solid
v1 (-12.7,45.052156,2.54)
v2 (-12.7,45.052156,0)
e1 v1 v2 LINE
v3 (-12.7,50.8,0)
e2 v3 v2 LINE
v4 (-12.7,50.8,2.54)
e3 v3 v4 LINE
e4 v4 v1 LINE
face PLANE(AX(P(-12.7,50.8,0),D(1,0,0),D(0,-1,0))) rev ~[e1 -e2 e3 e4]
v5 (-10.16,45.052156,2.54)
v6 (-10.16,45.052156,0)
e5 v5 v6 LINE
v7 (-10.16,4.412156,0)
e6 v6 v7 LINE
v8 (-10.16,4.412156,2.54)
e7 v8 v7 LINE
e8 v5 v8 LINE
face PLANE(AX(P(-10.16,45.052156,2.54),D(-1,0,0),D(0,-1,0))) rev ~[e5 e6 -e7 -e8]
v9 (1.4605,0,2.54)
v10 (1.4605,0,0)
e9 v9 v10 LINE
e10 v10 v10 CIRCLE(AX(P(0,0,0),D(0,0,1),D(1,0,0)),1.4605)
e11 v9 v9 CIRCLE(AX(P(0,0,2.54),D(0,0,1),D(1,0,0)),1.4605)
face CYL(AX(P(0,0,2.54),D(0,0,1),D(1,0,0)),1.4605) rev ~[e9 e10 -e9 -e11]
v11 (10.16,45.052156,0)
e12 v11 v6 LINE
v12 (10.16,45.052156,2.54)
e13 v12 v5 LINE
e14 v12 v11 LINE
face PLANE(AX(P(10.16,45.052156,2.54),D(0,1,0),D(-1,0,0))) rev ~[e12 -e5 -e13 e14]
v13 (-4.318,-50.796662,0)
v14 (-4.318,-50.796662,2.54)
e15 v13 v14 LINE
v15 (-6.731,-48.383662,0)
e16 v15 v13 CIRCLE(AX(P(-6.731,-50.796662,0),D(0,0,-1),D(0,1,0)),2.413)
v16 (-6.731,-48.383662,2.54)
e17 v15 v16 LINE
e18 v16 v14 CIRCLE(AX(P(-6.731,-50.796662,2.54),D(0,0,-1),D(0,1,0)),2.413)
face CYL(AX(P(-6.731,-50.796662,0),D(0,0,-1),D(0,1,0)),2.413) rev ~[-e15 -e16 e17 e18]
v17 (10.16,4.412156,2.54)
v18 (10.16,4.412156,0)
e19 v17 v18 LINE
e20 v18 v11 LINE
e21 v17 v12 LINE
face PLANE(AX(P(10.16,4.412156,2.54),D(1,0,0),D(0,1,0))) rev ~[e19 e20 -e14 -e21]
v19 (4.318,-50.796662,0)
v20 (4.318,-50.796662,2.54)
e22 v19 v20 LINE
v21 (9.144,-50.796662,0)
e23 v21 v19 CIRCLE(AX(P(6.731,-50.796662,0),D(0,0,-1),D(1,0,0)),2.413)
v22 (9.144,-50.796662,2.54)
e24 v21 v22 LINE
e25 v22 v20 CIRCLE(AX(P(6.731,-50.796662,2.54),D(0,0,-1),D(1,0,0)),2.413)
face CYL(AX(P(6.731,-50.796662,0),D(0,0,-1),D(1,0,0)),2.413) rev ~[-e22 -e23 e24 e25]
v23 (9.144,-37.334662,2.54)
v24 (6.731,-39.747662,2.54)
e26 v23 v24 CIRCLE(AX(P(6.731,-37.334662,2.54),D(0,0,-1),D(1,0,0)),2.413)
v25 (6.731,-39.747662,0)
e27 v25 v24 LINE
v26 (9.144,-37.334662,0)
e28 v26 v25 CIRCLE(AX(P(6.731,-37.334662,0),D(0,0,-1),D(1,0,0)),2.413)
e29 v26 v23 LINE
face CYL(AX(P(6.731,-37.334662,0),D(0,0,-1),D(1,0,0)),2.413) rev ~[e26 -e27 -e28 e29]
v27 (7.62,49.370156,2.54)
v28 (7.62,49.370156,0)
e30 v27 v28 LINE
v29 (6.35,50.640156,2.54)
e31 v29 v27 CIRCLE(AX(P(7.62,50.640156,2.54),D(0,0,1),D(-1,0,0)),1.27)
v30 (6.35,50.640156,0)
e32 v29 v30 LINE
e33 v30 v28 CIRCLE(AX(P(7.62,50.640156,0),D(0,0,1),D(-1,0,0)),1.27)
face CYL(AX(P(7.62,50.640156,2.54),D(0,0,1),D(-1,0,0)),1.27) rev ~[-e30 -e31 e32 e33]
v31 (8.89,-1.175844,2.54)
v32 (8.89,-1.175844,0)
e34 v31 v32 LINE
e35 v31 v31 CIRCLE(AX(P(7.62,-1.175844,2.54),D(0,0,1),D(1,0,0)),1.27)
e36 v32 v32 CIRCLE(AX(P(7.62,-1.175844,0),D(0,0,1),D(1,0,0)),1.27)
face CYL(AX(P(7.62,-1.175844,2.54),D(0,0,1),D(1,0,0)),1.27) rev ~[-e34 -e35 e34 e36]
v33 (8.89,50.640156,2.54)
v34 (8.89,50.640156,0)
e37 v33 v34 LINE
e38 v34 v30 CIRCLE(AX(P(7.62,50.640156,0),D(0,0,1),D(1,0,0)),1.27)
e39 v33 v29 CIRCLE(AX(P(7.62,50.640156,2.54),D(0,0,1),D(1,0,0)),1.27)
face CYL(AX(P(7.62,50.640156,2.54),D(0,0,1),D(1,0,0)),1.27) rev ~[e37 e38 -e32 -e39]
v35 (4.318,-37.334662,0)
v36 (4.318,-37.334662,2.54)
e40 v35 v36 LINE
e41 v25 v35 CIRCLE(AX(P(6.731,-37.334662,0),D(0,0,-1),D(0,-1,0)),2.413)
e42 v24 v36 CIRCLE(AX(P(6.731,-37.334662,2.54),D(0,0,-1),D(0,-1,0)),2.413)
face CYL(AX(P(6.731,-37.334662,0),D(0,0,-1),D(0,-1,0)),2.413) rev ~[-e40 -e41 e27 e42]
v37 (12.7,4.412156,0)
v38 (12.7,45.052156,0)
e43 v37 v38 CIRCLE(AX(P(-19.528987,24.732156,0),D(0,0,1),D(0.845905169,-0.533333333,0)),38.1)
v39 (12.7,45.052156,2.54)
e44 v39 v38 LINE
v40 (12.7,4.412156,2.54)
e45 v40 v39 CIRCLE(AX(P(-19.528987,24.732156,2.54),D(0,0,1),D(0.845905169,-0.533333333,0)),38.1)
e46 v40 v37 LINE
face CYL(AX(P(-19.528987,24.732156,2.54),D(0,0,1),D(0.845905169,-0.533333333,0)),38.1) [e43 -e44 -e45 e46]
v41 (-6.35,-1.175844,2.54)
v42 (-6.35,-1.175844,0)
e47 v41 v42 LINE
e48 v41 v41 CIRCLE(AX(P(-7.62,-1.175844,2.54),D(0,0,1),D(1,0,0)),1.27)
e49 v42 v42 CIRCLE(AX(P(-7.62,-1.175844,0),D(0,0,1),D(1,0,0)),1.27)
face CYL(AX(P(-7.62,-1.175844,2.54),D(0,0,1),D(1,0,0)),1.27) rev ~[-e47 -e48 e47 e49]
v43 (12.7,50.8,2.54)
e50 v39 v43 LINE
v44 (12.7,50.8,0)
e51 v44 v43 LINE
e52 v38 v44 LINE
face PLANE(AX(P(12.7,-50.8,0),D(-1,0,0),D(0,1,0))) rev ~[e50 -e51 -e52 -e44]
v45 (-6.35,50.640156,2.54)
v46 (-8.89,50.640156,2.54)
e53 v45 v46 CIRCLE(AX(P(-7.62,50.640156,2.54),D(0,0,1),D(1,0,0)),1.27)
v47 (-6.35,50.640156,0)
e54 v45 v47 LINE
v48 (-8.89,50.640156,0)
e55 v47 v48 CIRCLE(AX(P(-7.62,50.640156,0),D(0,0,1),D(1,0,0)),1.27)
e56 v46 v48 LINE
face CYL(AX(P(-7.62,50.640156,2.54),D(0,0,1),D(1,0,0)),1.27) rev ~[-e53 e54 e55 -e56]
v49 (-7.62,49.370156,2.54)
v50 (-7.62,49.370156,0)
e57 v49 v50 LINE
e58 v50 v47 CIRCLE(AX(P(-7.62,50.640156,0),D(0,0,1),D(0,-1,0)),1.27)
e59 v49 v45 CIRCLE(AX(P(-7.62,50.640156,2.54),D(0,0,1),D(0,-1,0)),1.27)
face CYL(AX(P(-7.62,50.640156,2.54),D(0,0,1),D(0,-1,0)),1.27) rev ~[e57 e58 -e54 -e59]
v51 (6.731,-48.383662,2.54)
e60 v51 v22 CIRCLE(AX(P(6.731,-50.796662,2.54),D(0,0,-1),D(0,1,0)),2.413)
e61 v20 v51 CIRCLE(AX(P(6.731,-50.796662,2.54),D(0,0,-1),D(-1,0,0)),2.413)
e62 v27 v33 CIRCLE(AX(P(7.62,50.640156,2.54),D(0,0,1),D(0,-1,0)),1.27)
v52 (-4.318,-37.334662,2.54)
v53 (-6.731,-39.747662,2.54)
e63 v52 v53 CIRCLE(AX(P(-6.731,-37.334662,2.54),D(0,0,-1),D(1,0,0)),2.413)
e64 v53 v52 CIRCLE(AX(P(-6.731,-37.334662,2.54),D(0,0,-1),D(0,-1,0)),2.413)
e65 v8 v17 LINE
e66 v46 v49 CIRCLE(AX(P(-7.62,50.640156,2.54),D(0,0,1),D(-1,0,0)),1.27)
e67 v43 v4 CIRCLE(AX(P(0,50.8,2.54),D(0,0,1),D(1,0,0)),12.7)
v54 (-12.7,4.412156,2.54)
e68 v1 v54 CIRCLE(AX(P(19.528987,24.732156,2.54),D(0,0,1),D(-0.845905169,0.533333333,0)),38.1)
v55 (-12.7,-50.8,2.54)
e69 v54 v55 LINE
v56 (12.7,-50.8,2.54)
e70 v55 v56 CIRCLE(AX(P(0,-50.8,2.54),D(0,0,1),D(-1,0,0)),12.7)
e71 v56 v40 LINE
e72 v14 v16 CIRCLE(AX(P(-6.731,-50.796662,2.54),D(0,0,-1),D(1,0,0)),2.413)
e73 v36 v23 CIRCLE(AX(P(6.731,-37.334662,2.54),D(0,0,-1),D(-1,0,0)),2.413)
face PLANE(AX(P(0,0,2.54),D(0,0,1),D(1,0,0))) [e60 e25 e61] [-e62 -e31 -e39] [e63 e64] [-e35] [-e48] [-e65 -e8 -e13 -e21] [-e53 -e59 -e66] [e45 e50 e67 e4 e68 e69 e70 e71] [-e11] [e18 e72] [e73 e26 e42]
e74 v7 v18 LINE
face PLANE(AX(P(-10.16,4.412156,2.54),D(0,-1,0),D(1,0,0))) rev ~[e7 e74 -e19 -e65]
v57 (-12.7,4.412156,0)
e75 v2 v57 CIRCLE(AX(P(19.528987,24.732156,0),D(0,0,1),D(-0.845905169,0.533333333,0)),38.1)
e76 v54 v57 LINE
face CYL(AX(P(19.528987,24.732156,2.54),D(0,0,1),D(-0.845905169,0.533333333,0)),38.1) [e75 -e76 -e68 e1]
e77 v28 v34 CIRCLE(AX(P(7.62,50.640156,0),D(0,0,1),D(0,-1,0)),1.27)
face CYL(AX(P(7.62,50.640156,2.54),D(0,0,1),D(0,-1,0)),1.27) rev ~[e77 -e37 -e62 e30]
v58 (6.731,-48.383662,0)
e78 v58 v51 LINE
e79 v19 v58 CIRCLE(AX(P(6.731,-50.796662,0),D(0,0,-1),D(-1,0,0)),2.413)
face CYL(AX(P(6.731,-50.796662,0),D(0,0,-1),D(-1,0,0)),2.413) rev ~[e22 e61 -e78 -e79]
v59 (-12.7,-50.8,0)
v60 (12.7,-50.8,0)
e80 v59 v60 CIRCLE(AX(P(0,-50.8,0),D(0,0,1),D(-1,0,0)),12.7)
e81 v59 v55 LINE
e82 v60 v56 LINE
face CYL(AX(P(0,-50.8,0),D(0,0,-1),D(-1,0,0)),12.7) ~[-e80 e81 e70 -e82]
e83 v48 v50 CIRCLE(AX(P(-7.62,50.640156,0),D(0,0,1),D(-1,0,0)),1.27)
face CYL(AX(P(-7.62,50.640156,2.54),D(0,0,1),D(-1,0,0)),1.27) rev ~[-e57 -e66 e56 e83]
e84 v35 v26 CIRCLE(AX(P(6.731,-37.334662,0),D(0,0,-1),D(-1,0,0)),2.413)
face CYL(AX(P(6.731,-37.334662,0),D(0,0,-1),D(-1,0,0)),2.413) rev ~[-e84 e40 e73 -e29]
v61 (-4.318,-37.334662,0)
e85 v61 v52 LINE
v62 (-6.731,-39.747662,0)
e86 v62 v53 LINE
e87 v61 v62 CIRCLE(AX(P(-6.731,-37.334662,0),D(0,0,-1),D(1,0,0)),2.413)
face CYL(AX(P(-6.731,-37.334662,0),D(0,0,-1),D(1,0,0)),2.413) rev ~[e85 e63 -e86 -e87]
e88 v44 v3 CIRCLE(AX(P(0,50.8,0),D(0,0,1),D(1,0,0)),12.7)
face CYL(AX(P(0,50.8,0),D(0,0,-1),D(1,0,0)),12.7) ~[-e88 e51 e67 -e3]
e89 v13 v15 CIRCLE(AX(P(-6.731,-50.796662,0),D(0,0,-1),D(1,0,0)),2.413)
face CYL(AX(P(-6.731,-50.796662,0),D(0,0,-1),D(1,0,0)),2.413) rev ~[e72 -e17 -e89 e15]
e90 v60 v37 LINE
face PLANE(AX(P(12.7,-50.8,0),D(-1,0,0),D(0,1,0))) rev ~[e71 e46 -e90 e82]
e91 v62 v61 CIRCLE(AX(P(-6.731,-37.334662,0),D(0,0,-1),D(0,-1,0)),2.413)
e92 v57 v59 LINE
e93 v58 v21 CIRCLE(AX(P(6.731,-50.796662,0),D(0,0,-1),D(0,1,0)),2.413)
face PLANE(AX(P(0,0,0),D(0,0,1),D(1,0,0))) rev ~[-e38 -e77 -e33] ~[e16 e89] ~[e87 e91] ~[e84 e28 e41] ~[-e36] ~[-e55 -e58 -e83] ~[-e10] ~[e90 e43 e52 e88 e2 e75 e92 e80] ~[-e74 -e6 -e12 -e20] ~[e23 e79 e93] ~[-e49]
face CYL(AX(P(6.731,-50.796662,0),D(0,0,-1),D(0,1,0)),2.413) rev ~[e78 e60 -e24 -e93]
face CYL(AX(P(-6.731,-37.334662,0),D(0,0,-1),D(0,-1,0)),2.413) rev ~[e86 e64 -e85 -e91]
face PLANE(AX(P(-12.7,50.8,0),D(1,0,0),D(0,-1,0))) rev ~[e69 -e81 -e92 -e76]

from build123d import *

# Parameters (mm, degrees)
F1_DEPTH = 2.54
F2_R     = 1.4605
F3_DEPTH = 2.541
F5_DEPTH = 2.54
F4_R     = 1.27
F6_DEPTH = 25.4


with BuildPart() as f1:
    # F0 (on Top) → F1 (new body)
    with BuildSketch(Plane.XY):
        with BuildLine():
            Line((12.7, -50.8), (12.7, 50.8))
            ThreePointArc((12.7, 50.8), (0, 63.5), (-12.7, 50.8))
            Line((-12.7, 50.8), (-12.7, -50.8))
            ThreePointArc((-12.7, -50.8), (0, -63.5), (12.7, -50.8))
        make_face()
        with BuildLine():
            Line((4.318, -50.7966617284), (-4.318, -50.7966617284))
            ThreePointArc((-4.318, -50.7966617284), (-8.437248663, -52.5029103914), (-6.731, -48.3836617284))
            Line((-6.731, -48.3836617284), (-6.731, -39.7476617284))
            ThreePointArc((-6.731, -39.7476617284), (-8.437248663, -35.6284130654), (-4.318, -37.3346617284))
            Line((-4.318, -37.3346617284), (4.318, -37.3346617284))
            ThreePointArc((4.318, -37.3346617284), (6.731, -34.9216617284), (9.144, -37.3346617284))
            ThreePointArc((9.144, -37.3346617284), (8.437248663, -39.0409103914), (6.731, -39.7476617284))
            Line((6.731, -39.7476617284), (6.731, -48.3836617284))
            ThreePointArc((6.731, -48.3836617284), (8.437248663, -49.0904130654), (9.144, -50.7966617284))
            ThreePointArc((9.144, -50.7966617284), (6.731, -53.2096617284), (4.318, -50.7966617284))
        make_face(mode=Mode.SUBTRACT)
        with BuildLine():
            ThreePointArc((-6.731, -48.3836617284), (-5.024751337, -49.0904130654), (-4.318, -50.7966617284))
            Line((-4.318, -50.7966617284), (4.318, -50.7966617284))
            ThreePointArc((4.318, -50.7966617284), (5.024751337, -49.0904130654), (6.731, -48.3836617284))
            Line((6.731, -48.3836617284), (6.731, -39.7476617284))
            ThreePointArc((6.731, -39.7476617284), (5.024751337, -39.0409103914), (4.318, -37.3346617284))
            Line((4.318, -37.3346617284), (-4.318, -37.3346617284))
            ThreePointArc((-4.318, -37.3346617284), (-5.024751337, -39.0409103914), (-6.731, -39.7476617284))
            Line((-6.731, -39.7476617284), (-6.731, -48.3836617284))
        make_face()
    extrude(amount=F1_DEPTH)

    # F2 (on face) → F3 (cut, through all)
    with BuildSketch(Plane.XY.offset(2.54)):
        Circle(F2_R)
    extrude(amount=-F3_DEPTH, mode=Mode.SUBTRACT)

    # F4 (on face) → F5 (join, through all)
    with BuildSketch(Plane.XY.offset(2.54)):
        with BuildLine():
            ThreePointArc((12.7, 4.4121561861), (18.5710130473, 24.7321561861), (12.7, 45.0521561861))
            Line((12.7, 45.0521561861), (12.7, 4.4121561861))
        make_face()
        with BuildLine():
            Line((-12.7, 4.4121561861), (-12.7, 45.0521561861))
            ThreePointArc((-12.7, 45.0521561861), (-18.5710130473, 24.7321561861), (-12.7, 4.4121561861))
        make_face()
    extrude(amount=-F5_DEPTH)

    # F4 (on face) → F6 (cut)
    with BuildSketch(Plane.XY.offset(2.54)):
        Polygon((10.16, 4.4121561861), (10.16, 45.0521561861), (7.62, 45.0521561861), (7.62, 37.1781561861), (0, 37.1781561861), (-7.62, 37.1781561861), (-7.62, 45.0521561861), (-10.16, 45.0521561861), (-10.16, 4.4121561861), align=None)
        Polygon((7.62, 37.1781561861), (7.62, 45.0521561861), (-7.62, 45.0521561861), (-7.62, 37.1781561861), (0, 37.1781561861), align=None)
        with BuildLine():
            ThreePointArc((6.35, 50.6401561861), (6.7219743879, 49.742130574), (7.62, 49.3701561861))
            Line((7.62, 49.3701561861), (7.62, 50.6401561861))
            Line((7.62, 50.6401561861), (6.35, 50.6401561861))
        make_face()
        with BuildLine():
            Line((7.62, 50.6401561861), (7.62, 49.3701561861))
            ThreePointArc((7.62, 49.3701561861), (8.5180256121, 49.742130574), (8.89, 50.6401561861))
            Line((8.89, 50.6401561861), (7.62, 50.6401561861))
        make_face()
        with BuildLine():
            Line((7.62, 50.6401561861), (8.89, 50.6401561861))
            ThreePointArc((8.89, 50.6401561861), (7.62, 51.9101561861), (6.35, 50.6401561861))
            Line((6.35, 50.6401561861), (7.62, 50.6401561861))
        make_face()
        with BuildLine():
            ThreePointArc((-8.89, 50.6401561861), (-8.5180256121, 49.742130574), (-7.62, 49.3701561861))
            Line((-7.62, 49.3701561861), (-7.62, 50.6401561861))
            Line((-7.62, 50.6401561861), (-8.89, 50.6401561861))
        make_face()
        with BuildLine():
            Line((-7.62, 50.6401561861), (-7.62, 49.3701561861))
            ThreePointArc((-7.62, 49.3701561861), (-6.7219743879, 49.742130574), (-6.35, 50.6401561861))
            Line((-6.35, 50.6401561861), (-7.62, 50.6401561861))
        make_face()
        with BuildLine():
            Line((-8.89, 50.6401561861), (-7.62, 50.6401561861))
            Line((-7.62, 50.6401561861), (-6.35, 50.6401561861))
            ThreePointArc((-6.35, 50.6401561861), (-7.62, 51.9101561861), (-8.89, 50.6401561861))
        make_face()
        with Locations((-7.62, -1.1758438139)):
            Circle(F4_R)
        with Locations((7.62, -1.1758438139)):
            Circle(F4_R)
    extrude(amount=-F6_DEPTH, mode=Mode.SUBTRACT)


solid = f1.part
